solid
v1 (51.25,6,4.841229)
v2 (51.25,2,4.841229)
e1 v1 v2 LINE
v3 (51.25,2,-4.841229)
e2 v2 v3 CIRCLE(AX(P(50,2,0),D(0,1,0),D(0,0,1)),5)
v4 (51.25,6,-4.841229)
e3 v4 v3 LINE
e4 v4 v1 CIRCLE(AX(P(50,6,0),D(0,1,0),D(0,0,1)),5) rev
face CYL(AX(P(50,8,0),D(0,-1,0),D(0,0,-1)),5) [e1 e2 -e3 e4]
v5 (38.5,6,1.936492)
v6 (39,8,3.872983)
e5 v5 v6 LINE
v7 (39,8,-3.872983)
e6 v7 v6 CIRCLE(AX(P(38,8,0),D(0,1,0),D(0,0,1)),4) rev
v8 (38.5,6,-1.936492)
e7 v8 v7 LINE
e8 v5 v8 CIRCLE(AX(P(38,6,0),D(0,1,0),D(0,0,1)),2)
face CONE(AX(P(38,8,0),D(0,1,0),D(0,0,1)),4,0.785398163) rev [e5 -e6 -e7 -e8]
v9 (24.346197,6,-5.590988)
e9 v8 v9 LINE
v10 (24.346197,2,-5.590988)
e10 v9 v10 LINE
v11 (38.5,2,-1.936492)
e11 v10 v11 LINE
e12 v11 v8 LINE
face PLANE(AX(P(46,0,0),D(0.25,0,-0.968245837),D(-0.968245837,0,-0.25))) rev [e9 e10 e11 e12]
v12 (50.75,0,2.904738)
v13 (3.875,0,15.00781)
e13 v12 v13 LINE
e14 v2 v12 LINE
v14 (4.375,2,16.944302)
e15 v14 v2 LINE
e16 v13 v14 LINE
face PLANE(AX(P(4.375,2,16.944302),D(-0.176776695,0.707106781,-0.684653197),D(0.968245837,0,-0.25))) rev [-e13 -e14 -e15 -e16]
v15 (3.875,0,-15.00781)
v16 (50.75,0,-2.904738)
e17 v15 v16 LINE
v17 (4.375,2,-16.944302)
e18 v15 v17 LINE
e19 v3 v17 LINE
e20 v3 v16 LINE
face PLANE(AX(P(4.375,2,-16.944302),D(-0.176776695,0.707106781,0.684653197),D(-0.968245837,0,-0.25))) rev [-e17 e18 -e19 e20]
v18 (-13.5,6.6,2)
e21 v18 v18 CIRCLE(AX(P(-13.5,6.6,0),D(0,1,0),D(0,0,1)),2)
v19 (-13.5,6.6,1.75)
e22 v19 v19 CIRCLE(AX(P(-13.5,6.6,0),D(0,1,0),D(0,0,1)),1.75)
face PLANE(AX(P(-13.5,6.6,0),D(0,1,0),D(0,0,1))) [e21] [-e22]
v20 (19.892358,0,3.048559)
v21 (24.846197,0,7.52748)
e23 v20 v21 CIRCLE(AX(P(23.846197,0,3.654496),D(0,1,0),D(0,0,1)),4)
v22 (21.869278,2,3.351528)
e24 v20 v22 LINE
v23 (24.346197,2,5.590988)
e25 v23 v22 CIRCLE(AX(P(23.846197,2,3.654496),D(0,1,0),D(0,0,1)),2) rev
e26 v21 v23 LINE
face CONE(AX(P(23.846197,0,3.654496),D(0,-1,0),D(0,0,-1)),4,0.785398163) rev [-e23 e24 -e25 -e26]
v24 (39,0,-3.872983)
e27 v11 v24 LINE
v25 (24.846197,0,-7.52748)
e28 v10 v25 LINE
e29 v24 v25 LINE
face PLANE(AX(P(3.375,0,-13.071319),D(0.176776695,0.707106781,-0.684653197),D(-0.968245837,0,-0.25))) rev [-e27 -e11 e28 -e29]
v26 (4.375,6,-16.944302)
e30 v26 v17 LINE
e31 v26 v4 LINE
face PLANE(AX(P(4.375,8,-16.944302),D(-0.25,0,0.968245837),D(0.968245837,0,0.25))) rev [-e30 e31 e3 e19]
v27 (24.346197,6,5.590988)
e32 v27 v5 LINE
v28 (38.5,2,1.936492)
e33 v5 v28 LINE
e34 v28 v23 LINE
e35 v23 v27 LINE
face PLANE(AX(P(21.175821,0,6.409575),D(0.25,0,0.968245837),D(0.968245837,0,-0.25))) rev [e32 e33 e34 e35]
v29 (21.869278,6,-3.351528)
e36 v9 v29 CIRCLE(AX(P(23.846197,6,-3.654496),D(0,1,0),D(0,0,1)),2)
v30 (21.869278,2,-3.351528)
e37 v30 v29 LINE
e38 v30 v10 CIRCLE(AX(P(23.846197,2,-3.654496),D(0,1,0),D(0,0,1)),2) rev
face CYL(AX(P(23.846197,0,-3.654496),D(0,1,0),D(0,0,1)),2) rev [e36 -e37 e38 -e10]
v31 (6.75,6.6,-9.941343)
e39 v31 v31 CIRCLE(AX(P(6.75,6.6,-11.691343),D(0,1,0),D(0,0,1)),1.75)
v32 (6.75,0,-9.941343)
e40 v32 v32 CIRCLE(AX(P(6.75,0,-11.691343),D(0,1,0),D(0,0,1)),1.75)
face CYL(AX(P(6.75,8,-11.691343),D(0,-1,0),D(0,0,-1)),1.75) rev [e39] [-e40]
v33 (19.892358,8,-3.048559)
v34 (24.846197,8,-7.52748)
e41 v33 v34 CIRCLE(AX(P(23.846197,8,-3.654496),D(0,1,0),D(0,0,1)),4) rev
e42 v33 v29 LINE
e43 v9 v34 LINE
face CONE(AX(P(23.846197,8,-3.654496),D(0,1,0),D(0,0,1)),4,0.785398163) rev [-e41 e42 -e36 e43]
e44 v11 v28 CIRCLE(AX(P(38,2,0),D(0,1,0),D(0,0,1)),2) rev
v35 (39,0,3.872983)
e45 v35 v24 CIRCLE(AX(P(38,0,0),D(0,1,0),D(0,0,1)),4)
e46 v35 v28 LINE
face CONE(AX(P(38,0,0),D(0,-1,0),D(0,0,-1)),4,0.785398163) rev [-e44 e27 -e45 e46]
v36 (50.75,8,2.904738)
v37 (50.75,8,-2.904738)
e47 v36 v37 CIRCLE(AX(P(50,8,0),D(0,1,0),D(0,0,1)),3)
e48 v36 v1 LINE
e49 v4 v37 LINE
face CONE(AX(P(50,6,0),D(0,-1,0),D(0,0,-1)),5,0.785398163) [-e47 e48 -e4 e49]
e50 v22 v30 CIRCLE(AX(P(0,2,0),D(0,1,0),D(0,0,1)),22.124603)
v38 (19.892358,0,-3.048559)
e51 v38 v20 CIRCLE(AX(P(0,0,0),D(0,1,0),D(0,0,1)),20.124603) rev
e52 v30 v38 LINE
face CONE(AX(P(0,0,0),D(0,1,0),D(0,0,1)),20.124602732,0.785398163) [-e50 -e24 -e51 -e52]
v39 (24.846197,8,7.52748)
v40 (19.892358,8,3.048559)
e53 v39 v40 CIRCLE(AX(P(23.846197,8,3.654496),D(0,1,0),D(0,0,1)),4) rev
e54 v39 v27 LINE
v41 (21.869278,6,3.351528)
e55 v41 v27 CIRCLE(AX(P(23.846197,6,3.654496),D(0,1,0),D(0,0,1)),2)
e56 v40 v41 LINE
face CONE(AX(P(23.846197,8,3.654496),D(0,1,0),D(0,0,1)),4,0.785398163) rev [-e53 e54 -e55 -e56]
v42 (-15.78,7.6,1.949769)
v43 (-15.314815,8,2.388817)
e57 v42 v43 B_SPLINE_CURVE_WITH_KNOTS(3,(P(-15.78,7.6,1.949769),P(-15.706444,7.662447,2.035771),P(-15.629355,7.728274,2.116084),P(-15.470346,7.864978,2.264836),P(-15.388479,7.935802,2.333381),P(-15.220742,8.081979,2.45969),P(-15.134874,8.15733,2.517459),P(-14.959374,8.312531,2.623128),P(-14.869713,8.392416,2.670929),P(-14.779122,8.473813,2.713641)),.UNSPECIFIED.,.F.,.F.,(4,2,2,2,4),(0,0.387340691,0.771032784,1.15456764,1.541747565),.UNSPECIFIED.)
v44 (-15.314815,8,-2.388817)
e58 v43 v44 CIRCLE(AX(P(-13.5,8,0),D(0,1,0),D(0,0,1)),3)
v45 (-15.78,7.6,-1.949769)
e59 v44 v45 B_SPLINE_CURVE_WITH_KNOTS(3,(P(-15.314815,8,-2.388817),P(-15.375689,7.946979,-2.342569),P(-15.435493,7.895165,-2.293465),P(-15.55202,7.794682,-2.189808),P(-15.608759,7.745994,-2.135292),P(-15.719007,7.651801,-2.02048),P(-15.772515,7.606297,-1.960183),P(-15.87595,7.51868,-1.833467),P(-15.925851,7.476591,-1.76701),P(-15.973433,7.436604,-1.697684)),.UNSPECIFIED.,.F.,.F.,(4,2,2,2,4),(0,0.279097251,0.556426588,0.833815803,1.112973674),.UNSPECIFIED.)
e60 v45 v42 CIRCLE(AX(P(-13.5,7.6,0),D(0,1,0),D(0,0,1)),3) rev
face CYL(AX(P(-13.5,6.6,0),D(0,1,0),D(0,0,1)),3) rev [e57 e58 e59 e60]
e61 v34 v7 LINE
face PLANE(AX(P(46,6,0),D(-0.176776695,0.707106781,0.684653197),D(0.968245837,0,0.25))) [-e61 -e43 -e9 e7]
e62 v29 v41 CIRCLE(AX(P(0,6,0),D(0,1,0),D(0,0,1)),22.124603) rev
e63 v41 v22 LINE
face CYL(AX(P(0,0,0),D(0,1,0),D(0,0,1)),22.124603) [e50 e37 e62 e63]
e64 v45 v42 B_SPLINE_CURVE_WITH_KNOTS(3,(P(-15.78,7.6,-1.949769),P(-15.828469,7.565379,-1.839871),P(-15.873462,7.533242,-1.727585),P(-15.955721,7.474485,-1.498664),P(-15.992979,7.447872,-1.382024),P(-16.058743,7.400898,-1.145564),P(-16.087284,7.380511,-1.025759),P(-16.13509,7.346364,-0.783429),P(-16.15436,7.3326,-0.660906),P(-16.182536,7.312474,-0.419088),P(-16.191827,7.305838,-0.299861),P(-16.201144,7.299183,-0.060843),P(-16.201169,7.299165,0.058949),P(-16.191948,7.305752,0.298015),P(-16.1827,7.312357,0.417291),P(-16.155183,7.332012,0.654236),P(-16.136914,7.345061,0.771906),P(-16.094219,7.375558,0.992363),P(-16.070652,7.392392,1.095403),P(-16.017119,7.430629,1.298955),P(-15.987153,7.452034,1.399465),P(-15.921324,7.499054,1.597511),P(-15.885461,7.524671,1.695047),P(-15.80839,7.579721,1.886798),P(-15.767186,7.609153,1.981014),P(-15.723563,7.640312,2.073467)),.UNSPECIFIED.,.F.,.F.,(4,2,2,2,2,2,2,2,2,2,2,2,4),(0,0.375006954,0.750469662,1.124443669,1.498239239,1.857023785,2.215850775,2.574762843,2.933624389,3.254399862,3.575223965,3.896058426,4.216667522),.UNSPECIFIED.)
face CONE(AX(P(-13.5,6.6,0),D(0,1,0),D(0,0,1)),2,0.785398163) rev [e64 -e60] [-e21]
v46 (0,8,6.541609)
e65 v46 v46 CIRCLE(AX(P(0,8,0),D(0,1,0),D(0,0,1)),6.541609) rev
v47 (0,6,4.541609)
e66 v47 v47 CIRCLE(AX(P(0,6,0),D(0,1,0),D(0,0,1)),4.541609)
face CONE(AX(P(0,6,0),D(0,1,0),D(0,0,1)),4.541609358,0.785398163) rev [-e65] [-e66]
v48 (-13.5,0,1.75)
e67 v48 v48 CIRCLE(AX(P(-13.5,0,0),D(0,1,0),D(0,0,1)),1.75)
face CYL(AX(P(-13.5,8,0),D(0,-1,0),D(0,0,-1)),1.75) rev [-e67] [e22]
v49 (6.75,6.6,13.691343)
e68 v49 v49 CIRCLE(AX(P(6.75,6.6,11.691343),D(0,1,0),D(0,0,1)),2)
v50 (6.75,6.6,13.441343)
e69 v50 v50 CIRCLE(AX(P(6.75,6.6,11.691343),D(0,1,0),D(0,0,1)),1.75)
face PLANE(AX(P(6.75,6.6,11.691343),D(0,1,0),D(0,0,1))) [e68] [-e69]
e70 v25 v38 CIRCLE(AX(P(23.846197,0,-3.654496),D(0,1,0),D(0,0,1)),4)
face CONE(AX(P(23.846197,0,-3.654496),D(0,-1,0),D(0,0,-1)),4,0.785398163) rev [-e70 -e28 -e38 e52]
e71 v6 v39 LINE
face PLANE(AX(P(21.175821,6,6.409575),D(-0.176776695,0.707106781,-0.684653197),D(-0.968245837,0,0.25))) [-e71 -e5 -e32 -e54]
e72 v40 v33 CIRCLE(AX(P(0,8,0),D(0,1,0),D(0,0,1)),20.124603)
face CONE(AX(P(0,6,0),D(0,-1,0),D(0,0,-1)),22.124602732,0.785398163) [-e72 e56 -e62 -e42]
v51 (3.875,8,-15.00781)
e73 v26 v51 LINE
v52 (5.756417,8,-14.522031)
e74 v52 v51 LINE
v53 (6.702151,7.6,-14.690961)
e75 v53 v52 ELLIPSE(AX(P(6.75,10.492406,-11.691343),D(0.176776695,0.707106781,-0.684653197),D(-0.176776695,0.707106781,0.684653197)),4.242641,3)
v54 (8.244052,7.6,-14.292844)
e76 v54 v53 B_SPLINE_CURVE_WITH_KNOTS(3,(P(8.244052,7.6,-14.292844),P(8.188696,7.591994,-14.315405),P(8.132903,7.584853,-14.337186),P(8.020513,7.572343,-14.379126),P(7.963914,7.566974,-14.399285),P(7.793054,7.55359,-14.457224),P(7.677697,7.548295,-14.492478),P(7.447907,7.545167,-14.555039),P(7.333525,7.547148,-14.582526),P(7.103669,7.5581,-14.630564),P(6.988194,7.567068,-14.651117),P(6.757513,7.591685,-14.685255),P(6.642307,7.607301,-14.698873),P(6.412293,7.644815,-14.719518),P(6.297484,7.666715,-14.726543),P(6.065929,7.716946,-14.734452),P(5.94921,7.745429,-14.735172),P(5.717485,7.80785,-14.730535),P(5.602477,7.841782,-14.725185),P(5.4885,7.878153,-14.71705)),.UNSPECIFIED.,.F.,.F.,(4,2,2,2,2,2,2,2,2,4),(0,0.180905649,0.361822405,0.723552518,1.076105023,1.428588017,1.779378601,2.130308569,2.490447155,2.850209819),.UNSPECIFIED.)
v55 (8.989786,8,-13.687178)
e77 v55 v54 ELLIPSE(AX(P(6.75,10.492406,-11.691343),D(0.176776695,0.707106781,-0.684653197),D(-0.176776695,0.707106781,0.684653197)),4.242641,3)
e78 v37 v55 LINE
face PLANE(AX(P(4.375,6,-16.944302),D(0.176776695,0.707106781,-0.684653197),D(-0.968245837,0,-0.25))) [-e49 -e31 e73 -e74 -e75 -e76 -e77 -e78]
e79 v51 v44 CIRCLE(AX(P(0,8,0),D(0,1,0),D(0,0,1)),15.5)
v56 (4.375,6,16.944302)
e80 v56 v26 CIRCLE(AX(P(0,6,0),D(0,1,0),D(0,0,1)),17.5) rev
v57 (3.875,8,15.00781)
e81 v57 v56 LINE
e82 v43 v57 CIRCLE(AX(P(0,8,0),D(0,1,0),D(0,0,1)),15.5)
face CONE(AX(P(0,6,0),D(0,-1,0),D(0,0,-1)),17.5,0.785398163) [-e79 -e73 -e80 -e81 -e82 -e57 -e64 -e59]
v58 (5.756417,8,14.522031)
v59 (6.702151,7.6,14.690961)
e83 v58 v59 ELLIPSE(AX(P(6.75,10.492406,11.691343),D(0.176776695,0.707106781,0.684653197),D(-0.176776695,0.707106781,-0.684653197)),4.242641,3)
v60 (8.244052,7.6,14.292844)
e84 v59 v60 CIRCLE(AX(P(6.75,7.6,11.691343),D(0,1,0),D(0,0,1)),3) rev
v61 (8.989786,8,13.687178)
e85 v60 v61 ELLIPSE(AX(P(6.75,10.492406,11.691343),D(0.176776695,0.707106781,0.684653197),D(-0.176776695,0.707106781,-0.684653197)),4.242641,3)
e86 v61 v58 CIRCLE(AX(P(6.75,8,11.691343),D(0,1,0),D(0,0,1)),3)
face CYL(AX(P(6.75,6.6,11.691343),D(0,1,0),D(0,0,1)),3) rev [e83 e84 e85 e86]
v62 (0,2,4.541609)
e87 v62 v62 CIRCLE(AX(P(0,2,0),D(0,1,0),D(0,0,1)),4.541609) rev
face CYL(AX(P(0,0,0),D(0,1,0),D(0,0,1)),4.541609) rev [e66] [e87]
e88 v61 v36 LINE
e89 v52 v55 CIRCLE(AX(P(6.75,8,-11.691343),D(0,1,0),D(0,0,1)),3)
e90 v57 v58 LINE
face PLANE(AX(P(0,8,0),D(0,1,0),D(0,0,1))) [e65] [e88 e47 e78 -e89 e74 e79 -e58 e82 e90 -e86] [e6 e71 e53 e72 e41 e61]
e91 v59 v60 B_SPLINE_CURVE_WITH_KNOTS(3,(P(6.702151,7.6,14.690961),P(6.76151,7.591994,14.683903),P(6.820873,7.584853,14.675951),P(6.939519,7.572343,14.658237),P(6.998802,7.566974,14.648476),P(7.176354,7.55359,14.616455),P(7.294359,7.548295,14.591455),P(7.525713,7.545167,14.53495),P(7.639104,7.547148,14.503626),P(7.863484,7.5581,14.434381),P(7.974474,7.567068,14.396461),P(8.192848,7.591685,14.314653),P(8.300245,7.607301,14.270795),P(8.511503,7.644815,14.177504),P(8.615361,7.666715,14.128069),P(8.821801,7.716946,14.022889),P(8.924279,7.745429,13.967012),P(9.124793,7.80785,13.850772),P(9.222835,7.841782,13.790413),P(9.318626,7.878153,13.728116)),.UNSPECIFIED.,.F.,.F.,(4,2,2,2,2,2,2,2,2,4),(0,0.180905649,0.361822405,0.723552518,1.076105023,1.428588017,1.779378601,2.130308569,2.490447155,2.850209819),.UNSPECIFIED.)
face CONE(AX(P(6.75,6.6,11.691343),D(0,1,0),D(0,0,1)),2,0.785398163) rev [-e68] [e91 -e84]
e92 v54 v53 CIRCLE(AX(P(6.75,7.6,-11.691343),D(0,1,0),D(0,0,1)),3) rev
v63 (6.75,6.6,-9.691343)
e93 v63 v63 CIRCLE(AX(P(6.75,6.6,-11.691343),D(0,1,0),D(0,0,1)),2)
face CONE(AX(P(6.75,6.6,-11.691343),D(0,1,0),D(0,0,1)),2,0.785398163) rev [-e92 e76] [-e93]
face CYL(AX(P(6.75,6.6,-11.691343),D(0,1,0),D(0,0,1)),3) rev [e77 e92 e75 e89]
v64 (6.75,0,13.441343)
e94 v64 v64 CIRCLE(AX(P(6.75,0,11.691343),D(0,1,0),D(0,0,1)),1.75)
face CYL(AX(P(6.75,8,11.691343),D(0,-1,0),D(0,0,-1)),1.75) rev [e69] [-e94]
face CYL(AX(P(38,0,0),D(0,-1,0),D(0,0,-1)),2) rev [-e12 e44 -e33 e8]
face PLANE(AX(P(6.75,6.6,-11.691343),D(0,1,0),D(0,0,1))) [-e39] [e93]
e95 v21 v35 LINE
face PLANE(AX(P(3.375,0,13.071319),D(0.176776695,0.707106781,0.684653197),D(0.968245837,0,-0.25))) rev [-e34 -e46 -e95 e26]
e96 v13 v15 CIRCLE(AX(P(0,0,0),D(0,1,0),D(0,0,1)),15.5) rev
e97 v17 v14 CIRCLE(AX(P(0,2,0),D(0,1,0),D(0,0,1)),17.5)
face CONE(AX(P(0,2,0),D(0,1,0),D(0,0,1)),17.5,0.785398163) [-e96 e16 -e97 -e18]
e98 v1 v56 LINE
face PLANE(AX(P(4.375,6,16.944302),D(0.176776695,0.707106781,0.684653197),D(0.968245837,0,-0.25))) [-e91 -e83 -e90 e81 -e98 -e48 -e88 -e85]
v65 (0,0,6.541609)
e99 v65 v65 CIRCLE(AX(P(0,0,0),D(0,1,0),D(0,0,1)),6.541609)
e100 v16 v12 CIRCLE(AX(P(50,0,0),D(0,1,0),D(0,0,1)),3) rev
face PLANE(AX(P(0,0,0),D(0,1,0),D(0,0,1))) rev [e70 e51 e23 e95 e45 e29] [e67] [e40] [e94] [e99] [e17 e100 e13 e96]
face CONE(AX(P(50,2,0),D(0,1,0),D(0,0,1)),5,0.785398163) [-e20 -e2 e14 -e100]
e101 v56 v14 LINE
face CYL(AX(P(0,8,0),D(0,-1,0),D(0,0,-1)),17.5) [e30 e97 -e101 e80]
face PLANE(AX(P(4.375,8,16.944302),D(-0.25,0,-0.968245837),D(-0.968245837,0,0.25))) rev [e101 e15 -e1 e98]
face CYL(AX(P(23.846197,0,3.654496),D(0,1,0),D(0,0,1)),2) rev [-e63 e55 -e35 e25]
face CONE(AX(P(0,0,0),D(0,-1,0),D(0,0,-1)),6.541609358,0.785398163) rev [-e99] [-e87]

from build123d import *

# Parameters (mm, degrees)
SKETCH1_R           = 1.75
BOSS_EXTRUDE1_DEPTH = 8
SKETCH2_R           = 3
CUT_EXTRUDE1_DEPTH  = 1.4
CUT_EXTRUDE2_DEPTH  = 59.268773799
FILLET1_R           = 2
CHAMFER1_SIZE       = 1
SKETCH4_R           = 4.541609358
CUT_EXTRUDE3_DEPTH  = 59.268773799
CHAMFER2_SIZE       = 2


with BuildPart() as part:
    # Sketch1 → Boss-Extrude1 (new body)
    with BuildSketch(Plane(origin=(0, 0, 0), x_dir=(1, 0, 0), z_dir=(0, 1, 0))):
        with BuildLine():
            Line((4.375, 16.94430214), (51.25, 4.841229183))
            ThreePointArc((51.25, 4.841229183), (55, 0), (51.25, -4.841229183))
            Line((51.25, -4.841229183), (4.375, -16.94430214))
            ThreePointArc((4.375, -16.94430214), (-17.5, 0), (4.375, 16.94430214))
        make_face()
        with Locations(Location((6.75, 11.691342951, 0), (0, 0, 270))):
            Circle(SKETCH1_R, mode=Mode.SUBTRACT)
        with Locations(Location((-13.5, 0, 0), (0, 0, 270))):
            Circle(SKETCH1_R, mode=Mode.SUBTRACT)
        with Locations(Location((6.75, -11.691342951, 0), (0, 0, 270))):
            Circle(SKETCH1_R, mode=Mode.SUBTRACT)
    extrude(amount=BOSS_EXTRUDE1_DEPTH)

    # Sketch2 → Cut-Extrude1 (cut)
    with BuildSketch(Plane(origin=(0, 8, 0), x_dir=(1, 0, 0), z_dir=(0, 1, 0))):
        with Locations(Location((6.75, -11.691342951, 0), (0, 0, 270))):
            Circle(SKETCH2_R)
        with Locations(Location((6.75, 11.691342951, 0), (0, 0, 270))):
            Circle(SKETCH2_R)
        with Locations(Location((-13.5, 0, 0), (0, 0, 270))):
            Circle(SKETCH2_R)
    extrude(amount=-CUT_EXTRUDE1_DEPTH, mode=Mode.SUBTRACT)

    # Sketch3 → Cut-Extrude2 (cut, through all)
    with BuildSketch(Plane(origin=(0, 8, 0), x_dir=(1, 0, 0), z_dir=(0, 1, 0))):
        with BuildLine():
            Line((21.175820833, -6.4095755), (46, 0))
            Line((46, 0), (21.175820833, 6.4095755))
            ThreePointArc((21.175820833, 6.4095755), (22.124602732, 0), (21.175820833, -6.4095755))
        make_face()
    extrude(amount=-CUT_EXTRUDE2_DEPTH, mode=Mode.SUBTRACT)

    # Fillet1
    fillet1_edges = [part.edges().sort_by_distance(p)[0] for p in [
        (21.175820833, 4, 6.4095755),
        (21.175820833, 4, -6.4095755),
        (46, 4, 0),
    ]]
    fillet(fillet1_edges, radius=FILLET1_R)

    # Chamfer1
    chamfer1_edges = [part.edges().sort_by_distance(p)[0] for p in [
        (6.75, 6.6, 8.691342951),
        (6.75, 6.6, -14.691342951),
        (-13.5, 6.6, -3),
    ]]
    chamfer(chamfer1_edges, length=CHAMFER1_SIZE)

    # Sketch4 → Cut-Extrude3 (cut, through all)
    with BuildSketch(Plane(origin=(0, 8, 0), x_dir=(1, 0, 0), z_dir=(0, 1, 0))):
        with Locations(Location((0, 0, 0), (0, 0, 270))):
            Circle(SKETCH4_R)
    extrude(amount=-CUT_EXTRUDE3_DEPTH, mode=Mode.SUBTRACT)

    # Chamfer2
    # the kernel refuses this chamfer: 2 mm, written as the material it takes off along each edge
    with BuildSketch(Plane(origin=(38, 0, 0), x_dir=(0.25, 0, 0.9682458365518543), z_dir=(-0.9682458365518543, 0, 0.25))) as chamfer2_piece_1:
        Polygon((2 + CHAMFER2_SIZE, 0), (2, CHAMFER2_SIZE), (2, 0), align=None)
    revolve(axis=Axis((38, 0, 0), (0, 1, 0)), revolution_arc=151.044975628, mode=Mode.SUBTRACT)
    with BuildSketch(Plane(origin=(24.346197065, 0, -5.590987877), x_dir=(0.24990547922782413, -0.027495876610586372, -0.9678797591753465), z_dir=(0.9682458365518543, 0, 0.24999999999999997)), Plane(origin=(38.5, 0, 1.936491673), x_dir=(0.2499054792278243, -0.027495876610585942, 0.9678797591753466), z_dir=(-0.9682458365518543, 0, 0.2500000000000001)), Plane(origin=(38.5, 8, -1.936491673), x_dir=(0.24990547922782413, 0.027495876610586497, -0.9678797591753466), z_dir=(-0.9682458365518543, 0, -0.24999999999999997)), Plane(origin=(24.346197065, 8, 5.590987877), x_dir=(0.2499054792278243, 0.02749587661058648, 0.9678797591753466), z_dir=(0.9682458365518543, 0, -0.2500000000000001))) as chamfer2_piece_2:
        Polygon((CHAMFER2_SIZE * 0.999621916911, CHAMFER2_SIZE * 0.0274958766106), (-CHAMFER2_SIZE * 0.0274958766106, CHAMFER2_SIZE * 0.999621916911), (0, 0), align=None)
    extrude(amount=14.617984814, mode=Mode.SUBTRACT)
    with BuildSketch(Plane(origin=(23.846197065, 0, -3.654496203), x_dir=(-0.9884596787014585, 0, 0.15148420241533292), z_dir=(0.15148420241533292, 0, 0.9884596787014585))) as chamfer2_piece_3:
        Polygon((2 + CHAMFER2_SIZE, 0), (2, -CHAMFER2_SIZE), (2, 0), align=None)
    revolve(axis=Axis((23.846197065, 0, -3.654496203), (0, -1, 0)), revolution_arc=113.190460245, mode=Mode.SUBTRACT)
    with BuildSketch(Plane(origin=(23.846197065, 0, 3.654496203), x_dir=(0.25000000000000006, 0, 0.9682458365518543), z_dir=(0.9682458365518543, 0, -0.25000000000000006))) as chamfer2_piece_4:
        Polygon((2 + CHAMFER2_SIZE, 0), (2, -CHAMFER2_SIZE), (2, 0), align=None)
    revolve(axis=Axis((23.846197065, 0, 3.654496203), (0, -1, 0)), revolution_arc=113.190460245, mode=Mode.SUBTRACT)
    with BuildSketch(Plane(origin=(0, 0, 0), x_dir=(0.988459678701458, 0, 0.151484202415335), z_dir=(-0.151484202415335, 0, 0.988459678701458))) as chamfer2_piece_5:
        Polygon((22.124602732 - CHAMFER2_SIZE, 0), (22.124602732, CHAMFER2_SIZE), (22.124602732, 0), align=None)
    revolve(axis=Axis((0, 0, 0), (0, 1, 0)), revolution_arc=17.425896117, mode=Mode.SUBTRACT)
    with BuildSketch(Plane(origin=(23.846197065, 8, -3.654496203), x_dir=(-0.9884596787014583, 0, 0.15148420241533467), z_dir=(0.15148420241533467, 0, 0.9884596787014583))) as chamfer2_piece_6:
        Polygon((2 + CHAMFER2_SIZE, 0), (2, CHAMFER2_SIZE), (2, 0), align=None)
    revolve(axis=Axis((23.846197065, 8, -3.654496203), (0, -1, 0)), revolution_arc=113.190460245, mode=Mode.SUBTRACT)
    with BuildSketch(Plane(origin=(0, 8, 0), x_dir=(0.9884596787014582, 0, -0.1514842024153346), z_dir=(-0.1514842024153346, 0, -0.9884596787014582))) as chamfer2_piece_7:
        Polygon((22.124602732 - CHAMFER2_SIZE, 0), (22.124602732, CHAMFER2_SIZE), (22.124602732, 0), align=None)
    revolve(axis=Axis((0, 8, 0), (0, -1, 0)), revolution_arc=17.425896117, mode=Mode.SUBTRACT)
    with BuildSketch(Plane(origin=(23.846197065, 8, 3.654496203), x_dir=(0.25000000000000006, 0, 0.9682458365518543), z_dir=(0.9682458365518543, 0, -0.25000000000000006))) as chamfer2_piece_8:
        Polygon((2 + CHAMFER2_SIZE, 0), (2, CHAMFER2_SIZE), (2, 0), align=None)
    revolve(axis=Axis((23.846197065, 8, 3.654496203), (0, -1, 0)), revolution_arc=113.190460245, mode=Mode.SUBTRACT)
    with BuildSketch(Plane(origin=(38, 8, 0), x_dir=(0.25, 0, 0.9682458365518543), z_dir=(-0.9682458365518543, 0, 0.25))) as chamfer2_piece_9:
        Polygon((2 + CHAMFER2_SIZE, 0), (2, -CHAMFER2_SIZE), (2, 0), align=None)
    revolve(axis=Axis((38, 8, 0), (0, 1, 0)), revolution_arc=151.044975628, mode=Mode.SUBTRACT)
    with BuildSketch(Plane(origin=(4.375, 0, -16.94430214), x_dir=(-0.24990547922782413, -0.027495876610586365, 0.9678797591753465), z_dir=(0.9682458365518543, 0, 0.24999999999999997)), Plane(origin=(51.25, 0, 4.841229183), x_dir=(-0.2499054792278242, -0.027495876610586348, -0.9678797591753466), z_dir=(-0.9682458365518543, 0, 0.24999999999999997))) as chamfer2_piece_10:
        Polygon((CHAMFER2_SIZE * 0.999621916911, -CHAMFER2_SIZE * 0.0274958766106), (-CHAMFER2_SIZE * 0.0274958766106, -CHAMFER2_SIZE * 0.999621916911), (0, 0), align=None)
    extrude(amount=48.412291828, mode=Mode.SUBTRACT)
    with BuildSketch(Plane(origin=(0, 0, 0), x_dir=(0.24999999999999994, 0, 0.9682458365518543), z_dir=(0.9682458365518543, 0, -0.24999999999999994))) as chamfer2_piece_11:
        Polygon((17.5 - CHAMFER2_SIZE, 0), (17.5, -CHAMFER2_SIZE), (17.5, 0), align=None)
    revolve(axis=Axis((0, 0, 0), (0, -1, 0)), revolution_arc=208.955024372, mode=Mode.SUBTRACT)
    with BuildSketch(Plane(origin=(50, 0, 0), x_dir=(0.25000000000000105, 0, -0.9682458365518539), z_dir=(-0.9682458365518539, 0, -0.25000000000000105))) as chamfer2_piece_12:
        Polygon((5 - CHAMFER2_SIZE, 0), (5, -CHAMFER2_SIZE), (5, 0), align=None)
    revolve(axis=Axis((50, 0, 0), (0, -1, 0)), revolution_arc=151.044975628, mode=Mode.SUBTRACT)
    with BuildSketch(Plane(origin=(50, 8, 0), x_dir=(0.25000000000000105, 0, -0.9682458365518539), z_dir=(-0.9682458365518539, 0, -0.25000000000000105))) as chamfer2_piece_13:
        Polygon((5 - CHAMFER2_SIZE, 0), (5, CHAMFER2_SIZE), (5, 0), align=None)
    revolve(axis=Axis((50, 8, 0), (0, -1, 0)), revolution_arc=151.044975628, mode=Mode.SUBTRACT)
    with BuildSketch(Plane(origin=(0, 0, 0), x_dir=(0, 0, 1), z_dir=(-1, 0, 0))) as chamfer2_piece_14:
        Polygon((4.541609358 + CHAMFER2_SIZE, 0), (4.541609358, CHAMFER2_SIZE), (4.541609358, 0), align=None)
    revolve(axis=Axis((0, 0, 0), (0, 1, 0)), mode=Mode.SUBTRACT)
    with BuildSketch(Plane(origin=(0, 8, 0), x_dir=(0, 0, 1), z_dir=(-1, 0, 0))) as chamfer2_piece_15:
        Polygon((4.541609358 + CHAMFER2_SIZE, 0), (4.541609358, -CHAMFER2_SIZE), (4.541609358, 0), align=None)
    revolve(axis=Axis((0, 8, 0), (0, 1, 0)), mode=Mode.SUBTRACT)
    with BuildSketch(Plane(origin=(4.375, 8, -16.94430214), x_dir=(-0.24990547922782413, 0.02749587661058648, 0.9678797591753465), z_dir=(0.9682458365518543, 0, 0.24999999999999997)), Plane(origin=(51.25, 8, 4.841229183), x_dir=(-0.2499054792278242, 0.027495876610586473, -0.9678797591753466), z_dir=(-0.9682458365518543, 0, 0.24999999999999997))) as chamfer2_piece_16:
        Polygon((CHAMFER2_SIZE * 0.999621916911, CHAMFER2_SIZE * 0.0274958766106), (-CHAMFER2_SIZE * 0.0274958766106, CHAMFER2_SIZE * 0.999621916911), (0, 0), align=None)
    extrude(amount=48.412291828, mode=Mode.SUBTRACT)
    with BuildSketch(Plane(origin=(0, 8, 0), x_dir=(0.24999999999999994, 0, 0.9682458365518543), z_dir=(0.9682458365518543, 0, -0.24999999999999994))) as chamfer2_piece_17:
        Polygon((17.5 - CHAMFER2_SIZE, 0), (17.5, CHAMFER2_SIZE), (17.5, 0), align=None)
    revolve(axis=Axis((0, 8, 0), (0, -1, 0)), revolution_arc=208.955024372, mode=Mode.SUBTRACT)


solid = part.part
